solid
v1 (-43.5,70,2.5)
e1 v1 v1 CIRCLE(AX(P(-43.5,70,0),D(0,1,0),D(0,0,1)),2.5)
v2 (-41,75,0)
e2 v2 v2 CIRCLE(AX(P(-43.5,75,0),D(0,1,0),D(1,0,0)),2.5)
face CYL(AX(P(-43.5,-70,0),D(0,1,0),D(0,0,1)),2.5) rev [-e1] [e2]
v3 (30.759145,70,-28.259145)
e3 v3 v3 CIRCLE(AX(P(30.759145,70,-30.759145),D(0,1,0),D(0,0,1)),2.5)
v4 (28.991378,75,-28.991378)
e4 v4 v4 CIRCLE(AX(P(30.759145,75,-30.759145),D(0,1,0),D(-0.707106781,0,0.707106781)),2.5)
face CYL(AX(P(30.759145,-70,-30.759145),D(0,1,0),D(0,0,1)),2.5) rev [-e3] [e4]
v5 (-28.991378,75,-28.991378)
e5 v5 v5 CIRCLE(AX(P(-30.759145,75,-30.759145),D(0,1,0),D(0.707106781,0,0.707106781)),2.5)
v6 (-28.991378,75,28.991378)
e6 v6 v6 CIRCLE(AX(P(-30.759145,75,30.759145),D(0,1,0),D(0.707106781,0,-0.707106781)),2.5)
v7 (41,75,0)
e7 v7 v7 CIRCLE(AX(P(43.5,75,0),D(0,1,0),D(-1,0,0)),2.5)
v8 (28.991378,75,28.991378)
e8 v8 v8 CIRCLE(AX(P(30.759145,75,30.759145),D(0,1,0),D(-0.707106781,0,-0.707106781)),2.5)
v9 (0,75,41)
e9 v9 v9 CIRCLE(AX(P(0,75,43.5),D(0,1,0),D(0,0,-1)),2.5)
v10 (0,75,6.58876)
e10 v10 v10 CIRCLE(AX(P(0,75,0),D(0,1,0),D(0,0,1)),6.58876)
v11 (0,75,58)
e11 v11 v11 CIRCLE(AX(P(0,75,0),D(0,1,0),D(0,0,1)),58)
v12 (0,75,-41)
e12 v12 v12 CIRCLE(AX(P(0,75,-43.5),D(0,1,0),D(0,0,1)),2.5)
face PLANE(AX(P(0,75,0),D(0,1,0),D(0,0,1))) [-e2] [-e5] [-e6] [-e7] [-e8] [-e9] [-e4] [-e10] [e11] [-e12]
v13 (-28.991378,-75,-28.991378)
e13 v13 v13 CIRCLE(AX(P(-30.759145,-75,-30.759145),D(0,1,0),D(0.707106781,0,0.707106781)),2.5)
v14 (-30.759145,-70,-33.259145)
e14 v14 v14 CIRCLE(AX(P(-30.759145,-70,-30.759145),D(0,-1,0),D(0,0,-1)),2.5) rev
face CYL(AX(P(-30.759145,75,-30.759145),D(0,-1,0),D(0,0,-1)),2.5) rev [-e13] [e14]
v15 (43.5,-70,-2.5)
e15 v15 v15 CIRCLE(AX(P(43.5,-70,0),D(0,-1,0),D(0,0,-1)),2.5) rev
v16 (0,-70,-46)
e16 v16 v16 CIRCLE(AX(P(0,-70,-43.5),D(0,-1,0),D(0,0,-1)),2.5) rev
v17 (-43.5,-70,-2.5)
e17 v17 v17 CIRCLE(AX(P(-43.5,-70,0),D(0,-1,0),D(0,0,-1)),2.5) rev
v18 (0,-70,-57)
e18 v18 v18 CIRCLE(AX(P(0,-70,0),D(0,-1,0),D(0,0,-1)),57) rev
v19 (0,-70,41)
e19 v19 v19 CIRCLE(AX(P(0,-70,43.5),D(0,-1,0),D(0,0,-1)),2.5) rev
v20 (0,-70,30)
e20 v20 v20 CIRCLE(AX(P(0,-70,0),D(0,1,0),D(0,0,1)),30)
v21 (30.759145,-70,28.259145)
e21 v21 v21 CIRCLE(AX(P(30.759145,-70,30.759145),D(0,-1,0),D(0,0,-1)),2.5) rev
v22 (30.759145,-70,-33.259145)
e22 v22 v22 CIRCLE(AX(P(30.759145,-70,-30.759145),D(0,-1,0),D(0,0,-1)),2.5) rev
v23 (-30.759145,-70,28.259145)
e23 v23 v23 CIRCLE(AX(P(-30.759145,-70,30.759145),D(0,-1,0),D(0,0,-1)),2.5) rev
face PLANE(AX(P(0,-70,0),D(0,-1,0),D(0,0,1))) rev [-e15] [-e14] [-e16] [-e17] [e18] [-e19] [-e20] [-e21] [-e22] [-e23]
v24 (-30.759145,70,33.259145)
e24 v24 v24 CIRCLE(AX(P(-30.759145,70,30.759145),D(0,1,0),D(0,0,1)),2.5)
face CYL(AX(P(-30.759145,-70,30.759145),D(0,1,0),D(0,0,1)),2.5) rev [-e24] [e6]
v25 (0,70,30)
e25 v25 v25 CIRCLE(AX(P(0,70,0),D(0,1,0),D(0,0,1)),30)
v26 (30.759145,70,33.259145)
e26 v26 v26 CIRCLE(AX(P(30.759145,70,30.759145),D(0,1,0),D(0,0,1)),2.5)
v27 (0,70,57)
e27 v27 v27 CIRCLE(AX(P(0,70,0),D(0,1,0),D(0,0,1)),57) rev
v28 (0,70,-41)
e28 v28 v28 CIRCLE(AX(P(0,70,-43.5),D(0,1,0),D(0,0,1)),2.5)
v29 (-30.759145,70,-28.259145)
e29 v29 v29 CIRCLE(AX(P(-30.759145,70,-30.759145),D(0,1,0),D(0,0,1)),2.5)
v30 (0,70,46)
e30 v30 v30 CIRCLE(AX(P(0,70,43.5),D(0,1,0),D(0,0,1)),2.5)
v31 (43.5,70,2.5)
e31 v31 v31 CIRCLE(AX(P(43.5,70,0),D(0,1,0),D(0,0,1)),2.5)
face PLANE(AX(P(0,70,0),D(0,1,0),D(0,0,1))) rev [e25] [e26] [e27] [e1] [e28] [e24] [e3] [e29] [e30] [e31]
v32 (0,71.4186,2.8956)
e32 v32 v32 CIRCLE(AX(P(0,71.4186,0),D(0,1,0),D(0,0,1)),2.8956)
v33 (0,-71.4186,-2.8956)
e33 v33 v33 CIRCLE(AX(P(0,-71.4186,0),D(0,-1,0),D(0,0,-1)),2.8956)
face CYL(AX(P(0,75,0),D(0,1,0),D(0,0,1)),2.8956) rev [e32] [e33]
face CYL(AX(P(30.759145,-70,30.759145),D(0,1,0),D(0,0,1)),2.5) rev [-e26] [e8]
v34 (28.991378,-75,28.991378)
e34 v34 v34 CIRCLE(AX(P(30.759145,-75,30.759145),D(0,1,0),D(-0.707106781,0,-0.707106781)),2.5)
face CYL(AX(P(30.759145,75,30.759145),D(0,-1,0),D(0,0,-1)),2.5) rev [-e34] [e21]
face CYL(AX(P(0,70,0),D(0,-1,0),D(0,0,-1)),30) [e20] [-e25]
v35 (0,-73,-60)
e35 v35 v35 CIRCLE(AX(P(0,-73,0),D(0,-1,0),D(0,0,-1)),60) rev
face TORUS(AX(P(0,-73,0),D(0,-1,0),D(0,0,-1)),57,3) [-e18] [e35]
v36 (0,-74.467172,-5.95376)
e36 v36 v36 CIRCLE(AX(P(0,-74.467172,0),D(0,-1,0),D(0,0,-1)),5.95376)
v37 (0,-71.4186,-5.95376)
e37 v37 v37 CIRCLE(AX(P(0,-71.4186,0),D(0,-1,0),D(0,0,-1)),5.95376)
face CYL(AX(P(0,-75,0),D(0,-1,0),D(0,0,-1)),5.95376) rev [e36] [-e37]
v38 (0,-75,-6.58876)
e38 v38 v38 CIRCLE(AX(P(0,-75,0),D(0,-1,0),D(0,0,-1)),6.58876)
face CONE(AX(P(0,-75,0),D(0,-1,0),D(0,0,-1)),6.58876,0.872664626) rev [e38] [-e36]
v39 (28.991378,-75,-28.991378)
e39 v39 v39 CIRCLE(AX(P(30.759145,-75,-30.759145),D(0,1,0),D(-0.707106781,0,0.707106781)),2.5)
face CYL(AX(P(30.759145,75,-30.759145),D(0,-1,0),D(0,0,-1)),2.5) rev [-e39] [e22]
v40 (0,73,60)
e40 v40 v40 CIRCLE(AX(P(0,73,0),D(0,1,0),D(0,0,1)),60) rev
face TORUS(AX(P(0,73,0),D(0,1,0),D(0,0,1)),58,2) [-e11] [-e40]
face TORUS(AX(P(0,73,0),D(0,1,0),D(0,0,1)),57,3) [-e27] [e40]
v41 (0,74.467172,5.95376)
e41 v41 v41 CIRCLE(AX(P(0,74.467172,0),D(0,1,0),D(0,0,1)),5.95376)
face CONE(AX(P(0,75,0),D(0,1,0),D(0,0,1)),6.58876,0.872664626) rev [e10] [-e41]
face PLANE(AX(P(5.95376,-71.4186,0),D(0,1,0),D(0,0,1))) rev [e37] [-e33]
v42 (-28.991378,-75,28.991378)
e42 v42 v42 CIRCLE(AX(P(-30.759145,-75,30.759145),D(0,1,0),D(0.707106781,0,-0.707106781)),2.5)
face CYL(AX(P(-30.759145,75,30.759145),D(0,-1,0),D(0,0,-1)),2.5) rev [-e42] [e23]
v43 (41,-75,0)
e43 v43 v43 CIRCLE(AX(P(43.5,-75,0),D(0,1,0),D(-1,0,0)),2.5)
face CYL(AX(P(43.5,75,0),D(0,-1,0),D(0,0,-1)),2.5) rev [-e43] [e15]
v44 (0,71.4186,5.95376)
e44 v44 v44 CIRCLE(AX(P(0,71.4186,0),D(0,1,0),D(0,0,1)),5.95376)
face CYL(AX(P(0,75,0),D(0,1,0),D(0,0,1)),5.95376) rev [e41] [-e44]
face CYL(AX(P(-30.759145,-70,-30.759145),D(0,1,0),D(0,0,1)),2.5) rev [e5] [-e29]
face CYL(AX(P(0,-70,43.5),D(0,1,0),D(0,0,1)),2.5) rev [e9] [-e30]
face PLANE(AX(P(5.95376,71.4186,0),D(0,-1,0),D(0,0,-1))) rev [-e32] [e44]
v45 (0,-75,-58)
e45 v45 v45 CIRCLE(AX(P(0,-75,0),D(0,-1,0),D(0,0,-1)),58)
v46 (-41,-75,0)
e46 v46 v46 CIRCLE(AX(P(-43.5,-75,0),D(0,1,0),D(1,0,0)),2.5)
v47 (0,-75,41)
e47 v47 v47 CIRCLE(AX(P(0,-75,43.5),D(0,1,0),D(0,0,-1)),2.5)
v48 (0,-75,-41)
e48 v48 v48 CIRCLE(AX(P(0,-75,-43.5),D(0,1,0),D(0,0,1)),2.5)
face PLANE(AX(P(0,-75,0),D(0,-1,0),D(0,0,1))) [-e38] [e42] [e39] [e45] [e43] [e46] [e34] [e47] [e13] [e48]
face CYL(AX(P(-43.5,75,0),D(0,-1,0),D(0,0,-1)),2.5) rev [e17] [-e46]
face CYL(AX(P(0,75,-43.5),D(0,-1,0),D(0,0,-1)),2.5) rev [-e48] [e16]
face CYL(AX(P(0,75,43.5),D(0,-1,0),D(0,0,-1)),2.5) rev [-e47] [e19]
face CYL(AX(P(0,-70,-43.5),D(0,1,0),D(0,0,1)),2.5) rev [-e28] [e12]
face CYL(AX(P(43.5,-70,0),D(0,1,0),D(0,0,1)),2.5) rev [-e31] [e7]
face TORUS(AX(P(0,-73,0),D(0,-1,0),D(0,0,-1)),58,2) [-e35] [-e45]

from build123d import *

# Parameters (mm, degrees)
SKETCH1_R               = 30
BOSS_EXTRUDE1_DEPTH     = 70
SKETCH2_R               = 60
BOSS_EXTRUDE2_DEPTH     = 5
FILLET1_R               = 2
FILLET5_R               = 3
SKETCH6_R               = 2.5
CUT_EXTRUDE1_DEPTH      = 169.0029762
CIRPATTERN1_COUNT       = 8
MIRROR1_COPY_1_SKETCH_R = 2.5
MIRROR1_COPY_1_DEPTH    = 169.0029762
MIRROR1_COPY_2_SKETCH_R = 2.5
MIRROR1_COPY_2_DEPTH    = 169.0029762
MIRROR1_COPY_3_SKETCH_R = 2.5
MIRROR1_COPY_3_DEPTH    = 169.0029762
MIRROR1_COPY_4_SKETCH_R = 2.5
MIRROR1_COPY_4_DEPTH    = 169.0029762
MIRROR1_COPY_5_SKETCH_R = 2.5
MIRROR1_COPY_5_DEPTH    = 169.0029762
MIRROR1_COPY_6_SKETCH_R = 2.5
MIRROR1_COPY_6_DEPTH    = 169.0029762
MIRROR1_COPY_7_SKETCH_R = 2.5
MIRROR1_COPY_7_DEPTH    = 169.0029762
FILLET1_OF_MIRROR1_R    = 2
FILLET5_OF_MIRROR1_R    = 3


with BuildPart() as part:
    # Sketch1 → Boss-Extrude1 (new, symmetric)
    with BuildSketch(Plane(origin=(0, 0, 0), x_dir=(1, 0, 0), z_dir=(0, 1, 0))):
        with Locations(Location((0, 0, 0), (0, 0, 270))):
            Circle(SKETCH1_R)
    extrude(amount=BOSS_EXTRUDE1_DEPTH, both=True)

    # Sketch2 → Boss-Extrude2 (add)
    with BuildSketch(Plane(origin=(0, 70, 0), x_dir=(1, 0, 0), z_dir=(0, 1, 0))):
        with Locations(Location((0, 0, 0), (0, 0, 270))):
            Circle(SKETCH2_R)
    boss_extrude2 = extrude(amount=BOSS_EXTRUDE2_DEPTH)

    # Fillet1
    fillet1_edges = [part.edges().sort_by_distance(p)[0] for p in [
        (0, 75, -60),
    ]]
    fillet(fillet1_edges, radius=FILLET1_R)

    # Fillet5
    fillet5_edges = [part.edges().sort_by_distance(p)[0] for p in [
        (0, 70, -60),
    ]]
    fillet(fillet5_edges, radius=FILLET5_R - 0.0001)  # a hair under: the kernel refuses the full size

    # Sketch5 → CBORE for #12 Binding Head Machine Screw1 (revolve, cut)
    with BuildSketch(Plane(origin=(0, 75, 0), x_dir=(0, 0, 1), z_dir=(1, 0, 0))):
        Polygon((0, 0), (0, 150), (2.8956, 150), (2.8956, 3.5814), (5.95376, 3.5814), (5.95376, 0.532828266), (6.58876, 0), align=None)
    cbore_for_12_binding_head_machine_screw = revolve(axis=Axis((0, 81.35, 0), (0, -1, 0)), mode=Mode.SUBTRACT)

    # Sketch6 → Cut-Extrude1 (cut, through all)
    with BuildSketch(Plane(origin=(0, 75, 0), x_dir=(1, 0, 0), z_dir=(0, 1, 0))):
        with Locations(Location((0, 43.5, 0), (0, 0, 270))):
            Circle(SKETCH6_R)
    cut_extrude1 = extrude(amount=-CUT_EXTRUDE1_DEPTH, mode=Mode.SUBTRACT)

    # CirPattern1: Cut-Extrude1 ×8 about axis
    cirpattern1_axis = Axis((0, 0, 0), (0, 1, 0))
    for i in range(1, CIRPATTERN1_COUNT):
        add(cut_extrude1.rotate(cirpattern1_axis, i * 360 / CIRPATTERN1_COUNT), mode=Mode.SUBTRACT)

    # Mirror1: Boss-Extrude2, CBORE for #12 Binding Head Machine Screw1, Cut-Extrude1 across plane
    add(boss_extrude2.mirror(Plane.ZX))
    add(cbore_for_12_binding_head_machine_screw.mirror(Plane.ZX), mode=Mode.SUBTRACT)
    add(cut_extrude1.mirror(Plane.ZX), mode=Mode.SUBTRACT)

    # Mirror1 copy 1 sketch → Mirror1 copy 1 (cut, through all)
    with BuildSketch(Plane(origin=(0, -75, 0), x_dir=(0.7071067811865476, 0, -0.7071067811865475), z_dir=(0, -1, 0))):
        with Locations((0, -43.5)):
            Circle(MIRROR1_COPY_1_SKETCH_R)
    extrude(amount=-MIRROR1_COPY_1_DEPTH, mode=Mode.SUBTRACT)

    # Mirror1 copy 2 sketch → Mirror1 copy 2 (cut, through all)
    with BuildSketch(Plane(origin=(0, -75, 0), x_dir=(0, 0, -1), z_dir=(0, -1, 0))):
        with Locations((0, -43.5)):
            Circle(MIRROR1_COPY_2_SKETCH_R)
    extrude(amount=-MIRROR1_COPY_2_DEPTH, mode=Mode.SUBTRACT)

    # Mirror1 copy 3 sketch → Mirror1 copy 3 (cut, through all)
    with BuildSketch(Plane(origin=(0, -75, 0), x_dir=(-0.7071067811865475, 0, -0.7071067811865476), z_dir=(0, -1, 0))):
        with Locations((0, -43.5)):
            Circle(MIRROR1_COPY_3_SKETCH_R)
    extrude(amount=-MIRROR1_COPY_3_DEPTH, mode=Mode.SUBTRACT)

    # Mirror1 copy 4 sketch → Mirror1 copy 4 (cut, through all)
    with BuildSketch(Plane(origin=(0, -75, 0), x_dir=(-1, 0, 0), z_dir=(0, -1, 0))):
        with Locations((0, -43.5)):
            Circle(MIRROR1_COPY_4_SKETCH_R)
    extrude(amount=-MIRROR1_COPY_4_DEPTH, mode=Mode.SUBTRACT)

    # Mirror1 copy 5 sketch → Mirror1 copy 5 (cut, through all)
    with BuildSketch(Plane(origin=(0, -75, 0), x_dir=(-0.7071067811865477, 0, 0.7071067811865475), z_dir=(0, -1, 0))):
        with Locations((0, -43.5)):
            Circle(MIRROR1_COPY_5_SKETCH_R)
    extrude(amount=-MIRROR1_COPY_5_DEPTH, mode=Mode.SUBTRACT)

    # Mirror1 copy 6 sketch → Mirror1 copy 6 (cut, through all)
    with BuildSketch(Plane(origin=(0, -75, 0), x_dir=(0, 0, 1), z_dir=(0, -1, 0))):
        with Locations((0, -43.5)):
            Circle(MIRROR1_COPY_6_SKETCH_R)
    extrude(amount=-MIRROR1_COPY_6_DEPTH, mode=Mode.SUBTRACT)

    # Mirror1 copy 7 sketch → Mirror1 copy 7 (cut, through all)
    with BuildSketch(Plane(origin=(0, -75, 0), x_dir=(0.7071067811865474, 0, 0.7071067811865477), z_dir=(0, -1, 0))):
        with Locations((0, -43.5)):
            Circle(MIRROR1_COPY_7_SKETCH_R)
    extrude(amount=-MIRROR1_COPY_7_DEPTH, mode=Mode.SUBTRACT)

    # Fillet1 of Mirror1
    fillet1_of_mirror1_edges = [part.edges().sort_by_distance(p)[0] for p in [
        (0, -75, -60),
    ]]
    fillet(fillet1_of_mirror1_edges, radius=FILLET1_OF_MIRROR1_R)

    # Fillet5 of Mirror1
    fillet5_of_mirror1_edges = [part.edges().sort_by_distance(p)[0] for p in [
        (0, -70, -60),
    ]]
    fillet(fillet5_of_mirror1_edges, radius=FILLET5_OF_MIRROR1_R - 0.0001)  # a hair under: the kernel refuses the full size


solid = part.part
